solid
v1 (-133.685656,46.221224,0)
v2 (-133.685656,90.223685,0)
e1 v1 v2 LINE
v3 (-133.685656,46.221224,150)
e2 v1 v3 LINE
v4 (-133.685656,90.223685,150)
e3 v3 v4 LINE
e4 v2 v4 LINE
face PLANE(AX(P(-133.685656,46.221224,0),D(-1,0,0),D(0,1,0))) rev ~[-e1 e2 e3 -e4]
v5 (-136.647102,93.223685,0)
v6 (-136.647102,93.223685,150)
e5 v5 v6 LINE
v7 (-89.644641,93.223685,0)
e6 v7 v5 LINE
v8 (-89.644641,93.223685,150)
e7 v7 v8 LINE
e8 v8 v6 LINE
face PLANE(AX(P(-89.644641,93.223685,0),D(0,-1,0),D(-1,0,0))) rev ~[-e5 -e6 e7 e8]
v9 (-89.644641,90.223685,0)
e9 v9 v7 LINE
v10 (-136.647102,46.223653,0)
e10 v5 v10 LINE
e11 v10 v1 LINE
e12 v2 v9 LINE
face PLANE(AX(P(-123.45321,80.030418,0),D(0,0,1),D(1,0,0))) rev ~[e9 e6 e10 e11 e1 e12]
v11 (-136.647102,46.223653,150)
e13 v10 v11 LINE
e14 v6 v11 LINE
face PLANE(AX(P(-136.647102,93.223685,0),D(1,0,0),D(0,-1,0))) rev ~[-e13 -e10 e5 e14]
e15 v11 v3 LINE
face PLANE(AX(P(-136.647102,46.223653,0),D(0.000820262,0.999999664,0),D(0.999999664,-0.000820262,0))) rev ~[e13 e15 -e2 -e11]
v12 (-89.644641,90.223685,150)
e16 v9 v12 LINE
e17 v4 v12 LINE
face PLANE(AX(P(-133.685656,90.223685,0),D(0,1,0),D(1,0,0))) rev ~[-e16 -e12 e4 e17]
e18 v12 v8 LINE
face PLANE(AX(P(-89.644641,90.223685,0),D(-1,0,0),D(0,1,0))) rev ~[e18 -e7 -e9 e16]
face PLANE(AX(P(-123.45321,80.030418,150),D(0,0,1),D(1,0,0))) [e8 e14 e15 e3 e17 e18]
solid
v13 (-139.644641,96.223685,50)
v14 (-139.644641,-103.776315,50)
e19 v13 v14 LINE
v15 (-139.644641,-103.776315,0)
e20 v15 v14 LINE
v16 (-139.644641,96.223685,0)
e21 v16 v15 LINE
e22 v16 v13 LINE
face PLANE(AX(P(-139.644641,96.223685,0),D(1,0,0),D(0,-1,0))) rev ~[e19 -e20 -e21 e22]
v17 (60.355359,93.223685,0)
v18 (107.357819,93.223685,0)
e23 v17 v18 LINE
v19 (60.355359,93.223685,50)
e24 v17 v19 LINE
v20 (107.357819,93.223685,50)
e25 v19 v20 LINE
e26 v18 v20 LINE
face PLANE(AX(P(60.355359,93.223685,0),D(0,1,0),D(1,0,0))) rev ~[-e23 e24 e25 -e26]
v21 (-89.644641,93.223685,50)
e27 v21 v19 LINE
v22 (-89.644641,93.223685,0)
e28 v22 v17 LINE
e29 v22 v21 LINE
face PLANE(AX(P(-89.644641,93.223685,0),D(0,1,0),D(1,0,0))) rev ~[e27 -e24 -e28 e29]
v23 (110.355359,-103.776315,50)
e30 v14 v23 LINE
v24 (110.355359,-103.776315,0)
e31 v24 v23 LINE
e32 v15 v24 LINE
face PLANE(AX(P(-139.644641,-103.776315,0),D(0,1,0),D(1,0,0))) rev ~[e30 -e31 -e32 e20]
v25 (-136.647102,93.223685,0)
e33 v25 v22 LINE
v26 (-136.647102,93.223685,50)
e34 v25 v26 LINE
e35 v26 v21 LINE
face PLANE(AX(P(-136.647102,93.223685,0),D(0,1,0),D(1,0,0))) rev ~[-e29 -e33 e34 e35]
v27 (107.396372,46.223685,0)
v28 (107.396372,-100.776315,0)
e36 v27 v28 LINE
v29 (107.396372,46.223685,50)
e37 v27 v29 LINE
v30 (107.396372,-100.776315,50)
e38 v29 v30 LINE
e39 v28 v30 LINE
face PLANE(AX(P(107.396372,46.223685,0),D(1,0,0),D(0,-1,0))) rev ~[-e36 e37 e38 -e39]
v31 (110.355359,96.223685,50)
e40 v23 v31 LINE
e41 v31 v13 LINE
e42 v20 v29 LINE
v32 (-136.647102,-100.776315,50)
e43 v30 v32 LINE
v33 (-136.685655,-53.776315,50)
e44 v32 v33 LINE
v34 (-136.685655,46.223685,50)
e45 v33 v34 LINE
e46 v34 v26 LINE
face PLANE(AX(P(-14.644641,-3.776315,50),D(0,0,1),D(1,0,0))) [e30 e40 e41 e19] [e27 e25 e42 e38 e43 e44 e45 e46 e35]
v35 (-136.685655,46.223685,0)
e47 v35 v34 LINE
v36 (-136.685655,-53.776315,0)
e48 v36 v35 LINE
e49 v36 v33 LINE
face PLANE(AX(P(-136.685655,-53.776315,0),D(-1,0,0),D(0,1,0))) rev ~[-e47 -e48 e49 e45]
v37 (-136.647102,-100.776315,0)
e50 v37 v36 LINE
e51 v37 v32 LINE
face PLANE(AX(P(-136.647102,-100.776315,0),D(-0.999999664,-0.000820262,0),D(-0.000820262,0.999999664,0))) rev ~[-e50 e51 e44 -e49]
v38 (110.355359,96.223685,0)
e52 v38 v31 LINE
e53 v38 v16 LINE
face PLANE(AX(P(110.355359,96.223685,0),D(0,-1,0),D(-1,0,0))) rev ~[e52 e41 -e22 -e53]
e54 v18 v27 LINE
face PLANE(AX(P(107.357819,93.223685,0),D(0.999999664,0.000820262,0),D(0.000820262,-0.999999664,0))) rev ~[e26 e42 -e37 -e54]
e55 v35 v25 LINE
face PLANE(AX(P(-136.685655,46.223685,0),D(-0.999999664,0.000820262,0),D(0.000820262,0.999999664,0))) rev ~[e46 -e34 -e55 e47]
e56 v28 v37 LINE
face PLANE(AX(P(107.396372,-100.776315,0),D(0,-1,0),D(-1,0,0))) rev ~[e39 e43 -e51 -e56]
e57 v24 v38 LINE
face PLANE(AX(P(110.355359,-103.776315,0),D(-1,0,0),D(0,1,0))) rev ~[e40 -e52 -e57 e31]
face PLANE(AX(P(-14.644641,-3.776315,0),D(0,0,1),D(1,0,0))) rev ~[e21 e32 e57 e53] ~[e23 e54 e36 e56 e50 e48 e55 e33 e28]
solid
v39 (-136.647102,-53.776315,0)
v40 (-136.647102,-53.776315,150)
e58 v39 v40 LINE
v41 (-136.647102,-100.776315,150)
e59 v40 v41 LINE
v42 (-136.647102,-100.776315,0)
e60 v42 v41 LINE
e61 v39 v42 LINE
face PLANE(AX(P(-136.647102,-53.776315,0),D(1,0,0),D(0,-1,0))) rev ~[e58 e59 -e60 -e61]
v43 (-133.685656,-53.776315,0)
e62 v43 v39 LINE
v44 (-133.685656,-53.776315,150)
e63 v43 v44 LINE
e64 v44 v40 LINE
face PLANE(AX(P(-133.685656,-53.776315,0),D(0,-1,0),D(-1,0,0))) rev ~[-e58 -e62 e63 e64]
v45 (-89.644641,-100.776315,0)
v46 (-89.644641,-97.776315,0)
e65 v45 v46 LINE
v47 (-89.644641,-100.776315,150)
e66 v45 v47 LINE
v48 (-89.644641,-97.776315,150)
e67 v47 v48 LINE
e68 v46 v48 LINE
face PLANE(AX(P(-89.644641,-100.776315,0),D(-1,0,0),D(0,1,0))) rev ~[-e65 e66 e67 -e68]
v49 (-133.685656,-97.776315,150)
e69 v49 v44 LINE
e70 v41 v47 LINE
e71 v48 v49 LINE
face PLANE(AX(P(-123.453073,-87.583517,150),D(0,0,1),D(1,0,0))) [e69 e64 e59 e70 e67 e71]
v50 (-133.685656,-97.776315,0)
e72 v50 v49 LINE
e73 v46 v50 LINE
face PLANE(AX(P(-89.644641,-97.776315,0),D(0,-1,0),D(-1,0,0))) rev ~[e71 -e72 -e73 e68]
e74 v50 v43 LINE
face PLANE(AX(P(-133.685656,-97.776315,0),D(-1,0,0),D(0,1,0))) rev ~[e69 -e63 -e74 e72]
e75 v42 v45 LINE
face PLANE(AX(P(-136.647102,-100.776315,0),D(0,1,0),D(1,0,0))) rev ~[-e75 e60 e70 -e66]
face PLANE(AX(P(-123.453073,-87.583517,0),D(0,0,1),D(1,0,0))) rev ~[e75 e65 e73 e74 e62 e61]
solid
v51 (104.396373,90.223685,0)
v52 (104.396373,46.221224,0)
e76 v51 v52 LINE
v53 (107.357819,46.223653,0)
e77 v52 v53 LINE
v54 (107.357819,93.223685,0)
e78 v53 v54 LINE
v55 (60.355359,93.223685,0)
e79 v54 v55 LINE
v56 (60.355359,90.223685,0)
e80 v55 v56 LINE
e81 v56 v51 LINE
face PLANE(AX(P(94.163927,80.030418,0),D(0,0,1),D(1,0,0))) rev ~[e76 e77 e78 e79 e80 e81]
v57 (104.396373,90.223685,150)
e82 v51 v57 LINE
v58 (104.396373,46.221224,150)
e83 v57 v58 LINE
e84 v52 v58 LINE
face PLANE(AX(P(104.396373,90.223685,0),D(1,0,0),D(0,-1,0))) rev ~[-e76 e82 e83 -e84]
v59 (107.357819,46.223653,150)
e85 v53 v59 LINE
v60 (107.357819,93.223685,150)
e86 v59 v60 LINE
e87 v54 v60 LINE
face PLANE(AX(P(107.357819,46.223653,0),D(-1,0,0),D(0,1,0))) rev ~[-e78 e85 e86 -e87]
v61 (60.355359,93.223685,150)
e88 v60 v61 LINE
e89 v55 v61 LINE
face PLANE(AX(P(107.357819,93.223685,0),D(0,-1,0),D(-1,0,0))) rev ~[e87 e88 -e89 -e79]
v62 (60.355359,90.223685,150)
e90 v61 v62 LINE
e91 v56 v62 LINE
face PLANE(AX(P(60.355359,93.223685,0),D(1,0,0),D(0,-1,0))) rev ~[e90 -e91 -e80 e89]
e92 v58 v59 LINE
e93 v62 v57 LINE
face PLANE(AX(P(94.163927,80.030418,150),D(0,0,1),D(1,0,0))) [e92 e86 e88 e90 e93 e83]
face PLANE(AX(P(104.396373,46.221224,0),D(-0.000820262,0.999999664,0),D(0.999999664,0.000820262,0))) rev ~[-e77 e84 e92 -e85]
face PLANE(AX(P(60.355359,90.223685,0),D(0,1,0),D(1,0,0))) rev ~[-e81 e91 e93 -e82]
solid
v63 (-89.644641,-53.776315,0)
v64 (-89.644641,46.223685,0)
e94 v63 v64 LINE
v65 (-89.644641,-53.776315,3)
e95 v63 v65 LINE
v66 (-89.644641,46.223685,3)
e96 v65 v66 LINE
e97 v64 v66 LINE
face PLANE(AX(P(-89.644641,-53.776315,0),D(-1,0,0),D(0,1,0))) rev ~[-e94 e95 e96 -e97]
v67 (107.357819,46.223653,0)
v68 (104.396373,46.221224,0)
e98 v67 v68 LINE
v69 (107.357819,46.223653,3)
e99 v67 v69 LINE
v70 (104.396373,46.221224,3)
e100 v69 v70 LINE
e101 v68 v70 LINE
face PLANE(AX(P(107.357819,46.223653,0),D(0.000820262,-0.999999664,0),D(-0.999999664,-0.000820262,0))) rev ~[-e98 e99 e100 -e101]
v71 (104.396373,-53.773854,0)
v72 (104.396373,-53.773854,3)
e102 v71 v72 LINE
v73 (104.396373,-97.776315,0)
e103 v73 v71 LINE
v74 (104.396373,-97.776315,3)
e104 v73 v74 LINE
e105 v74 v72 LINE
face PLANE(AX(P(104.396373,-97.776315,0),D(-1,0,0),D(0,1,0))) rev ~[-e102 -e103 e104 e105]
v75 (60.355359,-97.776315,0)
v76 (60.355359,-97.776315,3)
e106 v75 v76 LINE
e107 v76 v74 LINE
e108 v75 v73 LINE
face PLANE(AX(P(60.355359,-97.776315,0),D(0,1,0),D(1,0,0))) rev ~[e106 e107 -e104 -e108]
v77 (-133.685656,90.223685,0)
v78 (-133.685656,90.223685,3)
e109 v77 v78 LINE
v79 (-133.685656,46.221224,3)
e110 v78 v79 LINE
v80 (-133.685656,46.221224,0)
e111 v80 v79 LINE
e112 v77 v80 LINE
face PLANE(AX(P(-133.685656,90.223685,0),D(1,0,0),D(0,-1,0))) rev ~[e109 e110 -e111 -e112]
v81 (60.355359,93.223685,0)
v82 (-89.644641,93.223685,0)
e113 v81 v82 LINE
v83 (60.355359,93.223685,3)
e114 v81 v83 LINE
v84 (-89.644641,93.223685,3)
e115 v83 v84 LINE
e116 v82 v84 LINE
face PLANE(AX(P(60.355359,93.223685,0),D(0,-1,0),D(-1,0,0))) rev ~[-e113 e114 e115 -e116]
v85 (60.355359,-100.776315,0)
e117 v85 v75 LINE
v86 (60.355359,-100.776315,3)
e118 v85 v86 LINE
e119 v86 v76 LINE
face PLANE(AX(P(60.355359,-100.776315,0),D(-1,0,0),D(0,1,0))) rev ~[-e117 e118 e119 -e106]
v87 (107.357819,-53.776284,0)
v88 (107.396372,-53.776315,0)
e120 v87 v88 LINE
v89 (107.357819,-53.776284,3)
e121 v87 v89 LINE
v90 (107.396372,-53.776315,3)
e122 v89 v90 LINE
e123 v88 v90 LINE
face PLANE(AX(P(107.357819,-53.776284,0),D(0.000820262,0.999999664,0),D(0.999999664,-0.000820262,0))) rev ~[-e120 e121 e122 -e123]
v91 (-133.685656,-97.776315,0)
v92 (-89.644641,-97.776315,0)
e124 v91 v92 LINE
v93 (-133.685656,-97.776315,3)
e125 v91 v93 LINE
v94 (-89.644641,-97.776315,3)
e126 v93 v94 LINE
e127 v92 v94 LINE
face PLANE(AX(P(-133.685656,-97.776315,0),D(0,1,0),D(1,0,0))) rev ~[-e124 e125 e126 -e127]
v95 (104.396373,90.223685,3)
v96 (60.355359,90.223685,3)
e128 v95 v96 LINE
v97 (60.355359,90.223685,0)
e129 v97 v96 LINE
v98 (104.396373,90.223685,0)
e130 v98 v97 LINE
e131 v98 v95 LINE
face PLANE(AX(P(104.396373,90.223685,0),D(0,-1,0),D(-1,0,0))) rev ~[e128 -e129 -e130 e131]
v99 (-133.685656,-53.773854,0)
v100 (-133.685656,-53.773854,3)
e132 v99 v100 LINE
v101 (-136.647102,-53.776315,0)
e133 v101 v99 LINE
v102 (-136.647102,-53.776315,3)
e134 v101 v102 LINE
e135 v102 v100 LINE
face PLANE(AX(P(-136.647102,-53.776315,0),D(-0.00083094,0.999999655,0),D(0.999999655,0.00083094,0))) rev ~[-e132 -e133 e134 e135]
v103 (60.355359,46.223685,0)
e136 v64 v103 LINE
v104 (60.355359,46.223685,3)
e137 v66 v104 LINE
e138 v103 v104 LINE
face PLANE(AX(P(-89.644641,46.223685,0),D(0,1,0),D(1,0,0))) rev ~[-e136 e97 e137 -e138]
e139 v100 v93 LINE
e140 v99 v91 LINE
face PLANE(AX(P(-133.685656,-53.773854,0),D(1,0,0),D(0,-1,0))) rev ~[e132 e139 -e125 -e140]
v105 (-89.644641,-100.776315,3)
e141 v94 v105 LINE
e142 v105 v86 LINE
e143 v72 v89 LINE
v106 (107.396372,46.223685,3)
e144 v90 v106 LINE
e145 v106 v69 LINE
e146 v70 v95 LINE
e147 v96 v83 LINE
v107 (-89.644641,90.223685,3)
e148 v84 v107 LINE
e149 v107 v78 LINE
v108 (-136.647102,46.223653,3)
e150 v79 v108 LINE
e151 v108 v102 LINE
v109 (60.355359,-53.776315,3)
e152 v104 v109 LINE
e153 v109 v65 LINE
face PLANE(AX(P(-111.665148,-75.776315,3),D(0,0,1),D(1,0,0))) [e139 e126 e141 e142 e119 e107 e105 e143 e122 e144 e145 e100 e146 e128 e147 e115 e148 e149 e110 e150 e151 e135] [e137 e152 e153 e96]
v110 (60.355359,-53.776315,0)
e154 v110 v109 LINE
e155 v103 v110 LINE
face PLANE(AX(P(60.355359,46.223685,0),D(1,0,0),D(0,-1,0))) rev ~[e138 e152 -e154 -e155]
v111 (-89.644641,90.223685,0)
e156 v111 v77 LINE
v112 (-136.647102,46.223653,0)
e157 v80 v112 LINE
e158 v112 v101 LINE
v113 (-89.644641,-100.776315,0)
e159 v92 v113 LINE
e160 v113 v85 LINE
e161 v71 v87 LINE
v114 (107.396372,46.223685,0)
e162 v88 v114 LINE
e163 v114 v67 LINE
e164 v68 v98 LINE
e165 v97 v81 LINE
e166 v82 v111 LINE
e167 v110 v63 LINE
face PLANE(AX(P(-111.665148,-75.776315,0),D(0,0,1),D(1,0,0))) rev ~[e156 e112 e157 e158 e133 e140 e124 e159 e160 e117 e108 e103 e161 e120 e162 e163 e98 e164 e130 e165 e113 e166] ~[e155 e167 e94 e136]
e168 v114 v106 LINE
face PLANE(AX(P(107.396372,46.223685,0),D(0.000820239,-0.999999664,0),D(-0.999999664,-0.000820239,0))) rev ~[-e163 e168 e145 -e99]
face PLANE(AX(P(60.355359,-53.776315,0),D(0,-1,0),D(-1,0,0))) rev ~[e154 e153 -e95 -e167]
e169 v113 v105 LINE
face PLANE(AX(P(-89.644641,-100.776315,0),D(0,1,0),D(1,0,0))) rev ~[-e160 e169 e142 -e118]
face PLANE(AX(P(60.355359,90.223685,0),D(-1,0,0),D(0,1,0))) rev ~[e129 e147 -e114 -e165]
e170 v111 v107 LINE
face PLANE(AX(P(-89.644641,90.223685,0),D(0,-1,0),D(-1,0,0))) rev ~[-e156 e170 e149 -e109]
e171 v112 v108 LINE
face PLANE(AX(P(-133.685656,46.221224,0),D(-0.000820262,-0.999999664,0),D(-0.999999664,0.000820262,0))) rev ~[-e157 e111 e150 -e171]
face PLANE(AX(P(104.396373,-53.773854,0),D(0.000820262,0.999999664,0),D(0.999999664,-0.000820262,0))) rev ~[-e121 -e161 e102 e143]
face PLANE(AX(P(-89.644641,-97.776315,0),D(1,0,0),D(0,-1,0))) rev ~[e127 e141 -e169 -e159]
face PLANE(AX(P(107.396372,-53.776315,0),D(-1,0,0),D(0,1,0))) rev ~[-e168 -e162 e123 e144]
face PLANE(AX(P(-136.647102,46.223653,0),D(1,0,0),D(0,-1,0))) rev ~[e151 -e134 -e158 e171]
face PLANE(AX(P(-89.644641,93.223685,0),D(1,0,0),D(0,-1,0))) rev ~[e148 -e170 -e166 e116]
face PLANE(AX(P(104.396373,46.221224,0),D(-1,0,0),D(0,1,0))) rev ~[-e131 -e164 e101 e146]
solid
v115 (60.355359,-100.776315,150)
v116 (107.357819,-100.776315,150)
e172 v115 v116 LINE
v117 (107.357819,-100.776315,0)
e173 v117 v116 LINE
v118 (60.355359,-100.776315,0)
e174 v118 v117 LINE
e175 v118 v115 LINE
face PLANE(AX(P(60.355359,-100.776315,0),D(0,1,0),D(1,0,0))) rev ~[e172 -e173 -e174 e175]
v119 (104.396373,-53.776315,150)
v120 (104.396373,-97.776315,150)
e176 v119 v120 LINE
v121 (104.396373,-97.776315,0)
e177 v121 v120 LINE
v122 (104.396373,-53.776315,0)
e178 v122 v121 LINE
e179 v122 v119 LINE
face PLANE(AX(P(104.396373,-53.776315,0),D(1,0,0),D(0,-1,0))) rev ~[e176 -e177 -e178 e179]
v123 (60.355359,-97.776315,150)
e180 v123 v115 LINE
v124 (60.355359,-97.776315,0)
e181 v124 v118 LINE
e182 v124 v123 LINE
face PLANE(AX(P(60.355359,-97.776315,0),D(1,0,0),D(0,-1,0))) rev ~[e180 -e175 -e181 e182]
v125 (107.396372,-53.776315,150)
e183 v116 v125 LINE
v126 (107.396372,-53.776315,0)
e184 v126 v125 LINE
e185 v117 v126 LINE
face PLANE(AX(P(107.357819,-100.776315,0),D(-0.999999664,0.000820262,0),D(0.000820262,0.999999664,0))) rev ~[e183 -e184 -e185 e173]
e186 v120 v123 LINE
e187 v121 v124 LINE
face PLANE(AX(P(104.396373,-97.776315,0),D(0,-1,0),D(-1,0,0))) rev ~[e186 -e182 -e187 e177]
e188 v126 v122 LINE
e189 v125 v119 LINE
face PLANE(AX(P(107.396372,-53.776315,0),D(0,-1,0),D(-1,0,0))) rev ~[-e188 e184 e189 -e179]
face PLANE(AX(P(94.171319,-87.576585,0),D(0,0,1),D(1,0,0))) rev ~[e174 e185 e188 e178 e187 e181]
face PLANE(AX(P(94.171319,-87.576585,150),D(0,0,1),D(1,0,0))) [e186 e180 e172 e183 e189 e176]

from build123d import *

# Parameters (mm, degrees)
F1_DEPTH = 150
F2_DEPTH = 150
F3_DEPTH = 50
F0_W     = 44.041014101
F0_H     = 44.0000000126
F4_DEPTH = 3


# Not quite as in the source:
# - ends of sketch curves that miss each other by under 0.0002 mm in the source are joined


with BuildPart() as f1:
    # F0 (on Top) → F1 (new body)
    with BuildSketch(Plane.XY):
        Polygon((-133.6856555302, 90.2236848028), (-89.6446414292, 90.2236848154), (-89.6446414292, 93.2236848154), (-136.6471022147, 93.2236848019), (-136.6471022147, 46.2236531798), (-133.6856555302, 46.2212240181), align=None)
    extrude(amount=F1_DEPTH)


with BuildPart() as f2:
    # F0 (on Top) → F2 (new body)
    with BuildSketch(Plane.XY):
        Polygon((60.3553585708, 93.2236848154), (60.3553585708, 90.2236848154), (104.3963726718, 90.2236848028), (104.3963726718, 46.2212240181), (107.3578193563, 46.2236531798), (107.3578193563, 93.2236848019), align=None)
    extrude(amount=F2_DEPTH)


with BuildPart() as f2b:
    # F0 (on Top) → F2, piece 2 (new body)
    with BuildSketch(Plane.XY):
        Polygon((107.3578193563, -53.7763151981), (104.3963726718, -53.7763151981), (104.3963726718, -97.7763151981), (60.3553585708, -97.7763152106), (60.3553585708, -100.7763152106), (107.3578193563, -100.7763151981), (107.3963716626, -53.7763151981), align=None)
    extrude(amount=F2_DEPTH)


with BuildPart() as f2c:
    # F0 (on Top) → F2, piece 3 (new body)
    with BuildSketch(Plane.XY):
        Polygon((-89.6446414292, -100.7763152106), (-89.6446414292, -97.7763152106), (-133.6856555302, -97.7763151981), (-133.6856555302, -53.7763151981), (-136.6471022147, -53.7763151981), (-136.6471022147, -100.7763151981), align=None)
    extrude(amount=F2_DEPTH)


with BuildPart() as f3:
    # F0 (on Top) → F3 (new body)
    with BuildSketch(Plane.XY):
        Polygon((-89.6446414292, 96.2236848019), (-136.6446414292, 96.2236848019), (-139.6446414292, 96.2236848019), (-139.6446414292, 46.2236848019), (-139.6446414292, -3.7763151976), (-139.6446414292, -103.7763151981), (110.3553585708, -103.7763151981), (110.3553585708, -53.7763151981), (110.3553585708, 96.2236848019), (60.3553585708, 96.2236848019), (-14.6446414292, 96.2236848019), align=None)
        Polygon((-136.6471022147, 93.2236848019), (-89.6446414292, 93.2236848154), (60.3553585708, 93.2236848154), (107.3578193563, 93.2236848019), (107.3963716626, 46.2236848019), (107.3963716626, -53.7763151981), (107.3963716626, -100.7763151981), (107.3578193563, -100.7763151981), (60.3553585708, -100.7763151981), (-89.6446414292, -100.7763151981), (-136.6471022147, -100.7763151981), (-136.685654521, -53.7763151981), (-136.685654521, 46.2236848028), align=None, mode=Mode.SUBTRACT)
    extrude(amount=F3_DEPTH)


with BuildPart() as f4:
    # F0 (on Top) → F4 (new body)
    with BuildSketch(Plane.XY):
        with Locations((-111.6651484797, -75.7763152043)):
            Rectangle(F0_W, F0_H)
        Polygon((-89.6446414292, -53.7763151981), (-89.6446414292, 46.2236848019), (-89.6446414292, 90.2236848154), (-133.6856555302, 90.2236848028), (-133.6856555302, 46.2212240181), (-136.6471022147, 46.2236531798), (-136.6471022147, -53.7763151981), (-133.6856555302, -53.7738544134), (-133.6856555302, -53.7763151981), align=None)
        Polygon((60.3553585708, -53.7763151981), (-89.6446414292, -53.7763151981), (-89.6446414292, -97.7763152106), (-89.6446414292, -100.7763152106), (60.3553585708, -100.7763151981), (60.3553585708, -97.7763152106), (104.3963726718, -97.7763151981), (104.3963726718, -53.7763151981), align=None)
        Polygon((60.3553585708, 90.2236848154), (60.3553585708, 46.2236848019), (60.3553585708, -53.7763151981), (104.3963726718, -53.7763151981), (104.3963726718, -53.7738544134), (107.3578193823, -53.7762835751), (107.3963716626, -53.7763151981), (107.3963716626, 46.2236848019), (107.3578193563, 46.2236531798), (104.3963726718, 46.2212240181), (104.3963726718, 90.2236848028), align=None)
        Polygon((-89.6446414292, 90.2236848154), (-89.6446414292, 46.2236848019), (60.3553585708, 46.2236848019), (60.3553585708, 90.2236848154), (60.3553585708, 93.2236848154), (-89.6446414292, 93.2236848154), align=None)
    extrude(amount=F4_DEPTH)


solid = Compound([f1.part, f2.part, f2b.part, f2c.part, f3.part, f4.part])
